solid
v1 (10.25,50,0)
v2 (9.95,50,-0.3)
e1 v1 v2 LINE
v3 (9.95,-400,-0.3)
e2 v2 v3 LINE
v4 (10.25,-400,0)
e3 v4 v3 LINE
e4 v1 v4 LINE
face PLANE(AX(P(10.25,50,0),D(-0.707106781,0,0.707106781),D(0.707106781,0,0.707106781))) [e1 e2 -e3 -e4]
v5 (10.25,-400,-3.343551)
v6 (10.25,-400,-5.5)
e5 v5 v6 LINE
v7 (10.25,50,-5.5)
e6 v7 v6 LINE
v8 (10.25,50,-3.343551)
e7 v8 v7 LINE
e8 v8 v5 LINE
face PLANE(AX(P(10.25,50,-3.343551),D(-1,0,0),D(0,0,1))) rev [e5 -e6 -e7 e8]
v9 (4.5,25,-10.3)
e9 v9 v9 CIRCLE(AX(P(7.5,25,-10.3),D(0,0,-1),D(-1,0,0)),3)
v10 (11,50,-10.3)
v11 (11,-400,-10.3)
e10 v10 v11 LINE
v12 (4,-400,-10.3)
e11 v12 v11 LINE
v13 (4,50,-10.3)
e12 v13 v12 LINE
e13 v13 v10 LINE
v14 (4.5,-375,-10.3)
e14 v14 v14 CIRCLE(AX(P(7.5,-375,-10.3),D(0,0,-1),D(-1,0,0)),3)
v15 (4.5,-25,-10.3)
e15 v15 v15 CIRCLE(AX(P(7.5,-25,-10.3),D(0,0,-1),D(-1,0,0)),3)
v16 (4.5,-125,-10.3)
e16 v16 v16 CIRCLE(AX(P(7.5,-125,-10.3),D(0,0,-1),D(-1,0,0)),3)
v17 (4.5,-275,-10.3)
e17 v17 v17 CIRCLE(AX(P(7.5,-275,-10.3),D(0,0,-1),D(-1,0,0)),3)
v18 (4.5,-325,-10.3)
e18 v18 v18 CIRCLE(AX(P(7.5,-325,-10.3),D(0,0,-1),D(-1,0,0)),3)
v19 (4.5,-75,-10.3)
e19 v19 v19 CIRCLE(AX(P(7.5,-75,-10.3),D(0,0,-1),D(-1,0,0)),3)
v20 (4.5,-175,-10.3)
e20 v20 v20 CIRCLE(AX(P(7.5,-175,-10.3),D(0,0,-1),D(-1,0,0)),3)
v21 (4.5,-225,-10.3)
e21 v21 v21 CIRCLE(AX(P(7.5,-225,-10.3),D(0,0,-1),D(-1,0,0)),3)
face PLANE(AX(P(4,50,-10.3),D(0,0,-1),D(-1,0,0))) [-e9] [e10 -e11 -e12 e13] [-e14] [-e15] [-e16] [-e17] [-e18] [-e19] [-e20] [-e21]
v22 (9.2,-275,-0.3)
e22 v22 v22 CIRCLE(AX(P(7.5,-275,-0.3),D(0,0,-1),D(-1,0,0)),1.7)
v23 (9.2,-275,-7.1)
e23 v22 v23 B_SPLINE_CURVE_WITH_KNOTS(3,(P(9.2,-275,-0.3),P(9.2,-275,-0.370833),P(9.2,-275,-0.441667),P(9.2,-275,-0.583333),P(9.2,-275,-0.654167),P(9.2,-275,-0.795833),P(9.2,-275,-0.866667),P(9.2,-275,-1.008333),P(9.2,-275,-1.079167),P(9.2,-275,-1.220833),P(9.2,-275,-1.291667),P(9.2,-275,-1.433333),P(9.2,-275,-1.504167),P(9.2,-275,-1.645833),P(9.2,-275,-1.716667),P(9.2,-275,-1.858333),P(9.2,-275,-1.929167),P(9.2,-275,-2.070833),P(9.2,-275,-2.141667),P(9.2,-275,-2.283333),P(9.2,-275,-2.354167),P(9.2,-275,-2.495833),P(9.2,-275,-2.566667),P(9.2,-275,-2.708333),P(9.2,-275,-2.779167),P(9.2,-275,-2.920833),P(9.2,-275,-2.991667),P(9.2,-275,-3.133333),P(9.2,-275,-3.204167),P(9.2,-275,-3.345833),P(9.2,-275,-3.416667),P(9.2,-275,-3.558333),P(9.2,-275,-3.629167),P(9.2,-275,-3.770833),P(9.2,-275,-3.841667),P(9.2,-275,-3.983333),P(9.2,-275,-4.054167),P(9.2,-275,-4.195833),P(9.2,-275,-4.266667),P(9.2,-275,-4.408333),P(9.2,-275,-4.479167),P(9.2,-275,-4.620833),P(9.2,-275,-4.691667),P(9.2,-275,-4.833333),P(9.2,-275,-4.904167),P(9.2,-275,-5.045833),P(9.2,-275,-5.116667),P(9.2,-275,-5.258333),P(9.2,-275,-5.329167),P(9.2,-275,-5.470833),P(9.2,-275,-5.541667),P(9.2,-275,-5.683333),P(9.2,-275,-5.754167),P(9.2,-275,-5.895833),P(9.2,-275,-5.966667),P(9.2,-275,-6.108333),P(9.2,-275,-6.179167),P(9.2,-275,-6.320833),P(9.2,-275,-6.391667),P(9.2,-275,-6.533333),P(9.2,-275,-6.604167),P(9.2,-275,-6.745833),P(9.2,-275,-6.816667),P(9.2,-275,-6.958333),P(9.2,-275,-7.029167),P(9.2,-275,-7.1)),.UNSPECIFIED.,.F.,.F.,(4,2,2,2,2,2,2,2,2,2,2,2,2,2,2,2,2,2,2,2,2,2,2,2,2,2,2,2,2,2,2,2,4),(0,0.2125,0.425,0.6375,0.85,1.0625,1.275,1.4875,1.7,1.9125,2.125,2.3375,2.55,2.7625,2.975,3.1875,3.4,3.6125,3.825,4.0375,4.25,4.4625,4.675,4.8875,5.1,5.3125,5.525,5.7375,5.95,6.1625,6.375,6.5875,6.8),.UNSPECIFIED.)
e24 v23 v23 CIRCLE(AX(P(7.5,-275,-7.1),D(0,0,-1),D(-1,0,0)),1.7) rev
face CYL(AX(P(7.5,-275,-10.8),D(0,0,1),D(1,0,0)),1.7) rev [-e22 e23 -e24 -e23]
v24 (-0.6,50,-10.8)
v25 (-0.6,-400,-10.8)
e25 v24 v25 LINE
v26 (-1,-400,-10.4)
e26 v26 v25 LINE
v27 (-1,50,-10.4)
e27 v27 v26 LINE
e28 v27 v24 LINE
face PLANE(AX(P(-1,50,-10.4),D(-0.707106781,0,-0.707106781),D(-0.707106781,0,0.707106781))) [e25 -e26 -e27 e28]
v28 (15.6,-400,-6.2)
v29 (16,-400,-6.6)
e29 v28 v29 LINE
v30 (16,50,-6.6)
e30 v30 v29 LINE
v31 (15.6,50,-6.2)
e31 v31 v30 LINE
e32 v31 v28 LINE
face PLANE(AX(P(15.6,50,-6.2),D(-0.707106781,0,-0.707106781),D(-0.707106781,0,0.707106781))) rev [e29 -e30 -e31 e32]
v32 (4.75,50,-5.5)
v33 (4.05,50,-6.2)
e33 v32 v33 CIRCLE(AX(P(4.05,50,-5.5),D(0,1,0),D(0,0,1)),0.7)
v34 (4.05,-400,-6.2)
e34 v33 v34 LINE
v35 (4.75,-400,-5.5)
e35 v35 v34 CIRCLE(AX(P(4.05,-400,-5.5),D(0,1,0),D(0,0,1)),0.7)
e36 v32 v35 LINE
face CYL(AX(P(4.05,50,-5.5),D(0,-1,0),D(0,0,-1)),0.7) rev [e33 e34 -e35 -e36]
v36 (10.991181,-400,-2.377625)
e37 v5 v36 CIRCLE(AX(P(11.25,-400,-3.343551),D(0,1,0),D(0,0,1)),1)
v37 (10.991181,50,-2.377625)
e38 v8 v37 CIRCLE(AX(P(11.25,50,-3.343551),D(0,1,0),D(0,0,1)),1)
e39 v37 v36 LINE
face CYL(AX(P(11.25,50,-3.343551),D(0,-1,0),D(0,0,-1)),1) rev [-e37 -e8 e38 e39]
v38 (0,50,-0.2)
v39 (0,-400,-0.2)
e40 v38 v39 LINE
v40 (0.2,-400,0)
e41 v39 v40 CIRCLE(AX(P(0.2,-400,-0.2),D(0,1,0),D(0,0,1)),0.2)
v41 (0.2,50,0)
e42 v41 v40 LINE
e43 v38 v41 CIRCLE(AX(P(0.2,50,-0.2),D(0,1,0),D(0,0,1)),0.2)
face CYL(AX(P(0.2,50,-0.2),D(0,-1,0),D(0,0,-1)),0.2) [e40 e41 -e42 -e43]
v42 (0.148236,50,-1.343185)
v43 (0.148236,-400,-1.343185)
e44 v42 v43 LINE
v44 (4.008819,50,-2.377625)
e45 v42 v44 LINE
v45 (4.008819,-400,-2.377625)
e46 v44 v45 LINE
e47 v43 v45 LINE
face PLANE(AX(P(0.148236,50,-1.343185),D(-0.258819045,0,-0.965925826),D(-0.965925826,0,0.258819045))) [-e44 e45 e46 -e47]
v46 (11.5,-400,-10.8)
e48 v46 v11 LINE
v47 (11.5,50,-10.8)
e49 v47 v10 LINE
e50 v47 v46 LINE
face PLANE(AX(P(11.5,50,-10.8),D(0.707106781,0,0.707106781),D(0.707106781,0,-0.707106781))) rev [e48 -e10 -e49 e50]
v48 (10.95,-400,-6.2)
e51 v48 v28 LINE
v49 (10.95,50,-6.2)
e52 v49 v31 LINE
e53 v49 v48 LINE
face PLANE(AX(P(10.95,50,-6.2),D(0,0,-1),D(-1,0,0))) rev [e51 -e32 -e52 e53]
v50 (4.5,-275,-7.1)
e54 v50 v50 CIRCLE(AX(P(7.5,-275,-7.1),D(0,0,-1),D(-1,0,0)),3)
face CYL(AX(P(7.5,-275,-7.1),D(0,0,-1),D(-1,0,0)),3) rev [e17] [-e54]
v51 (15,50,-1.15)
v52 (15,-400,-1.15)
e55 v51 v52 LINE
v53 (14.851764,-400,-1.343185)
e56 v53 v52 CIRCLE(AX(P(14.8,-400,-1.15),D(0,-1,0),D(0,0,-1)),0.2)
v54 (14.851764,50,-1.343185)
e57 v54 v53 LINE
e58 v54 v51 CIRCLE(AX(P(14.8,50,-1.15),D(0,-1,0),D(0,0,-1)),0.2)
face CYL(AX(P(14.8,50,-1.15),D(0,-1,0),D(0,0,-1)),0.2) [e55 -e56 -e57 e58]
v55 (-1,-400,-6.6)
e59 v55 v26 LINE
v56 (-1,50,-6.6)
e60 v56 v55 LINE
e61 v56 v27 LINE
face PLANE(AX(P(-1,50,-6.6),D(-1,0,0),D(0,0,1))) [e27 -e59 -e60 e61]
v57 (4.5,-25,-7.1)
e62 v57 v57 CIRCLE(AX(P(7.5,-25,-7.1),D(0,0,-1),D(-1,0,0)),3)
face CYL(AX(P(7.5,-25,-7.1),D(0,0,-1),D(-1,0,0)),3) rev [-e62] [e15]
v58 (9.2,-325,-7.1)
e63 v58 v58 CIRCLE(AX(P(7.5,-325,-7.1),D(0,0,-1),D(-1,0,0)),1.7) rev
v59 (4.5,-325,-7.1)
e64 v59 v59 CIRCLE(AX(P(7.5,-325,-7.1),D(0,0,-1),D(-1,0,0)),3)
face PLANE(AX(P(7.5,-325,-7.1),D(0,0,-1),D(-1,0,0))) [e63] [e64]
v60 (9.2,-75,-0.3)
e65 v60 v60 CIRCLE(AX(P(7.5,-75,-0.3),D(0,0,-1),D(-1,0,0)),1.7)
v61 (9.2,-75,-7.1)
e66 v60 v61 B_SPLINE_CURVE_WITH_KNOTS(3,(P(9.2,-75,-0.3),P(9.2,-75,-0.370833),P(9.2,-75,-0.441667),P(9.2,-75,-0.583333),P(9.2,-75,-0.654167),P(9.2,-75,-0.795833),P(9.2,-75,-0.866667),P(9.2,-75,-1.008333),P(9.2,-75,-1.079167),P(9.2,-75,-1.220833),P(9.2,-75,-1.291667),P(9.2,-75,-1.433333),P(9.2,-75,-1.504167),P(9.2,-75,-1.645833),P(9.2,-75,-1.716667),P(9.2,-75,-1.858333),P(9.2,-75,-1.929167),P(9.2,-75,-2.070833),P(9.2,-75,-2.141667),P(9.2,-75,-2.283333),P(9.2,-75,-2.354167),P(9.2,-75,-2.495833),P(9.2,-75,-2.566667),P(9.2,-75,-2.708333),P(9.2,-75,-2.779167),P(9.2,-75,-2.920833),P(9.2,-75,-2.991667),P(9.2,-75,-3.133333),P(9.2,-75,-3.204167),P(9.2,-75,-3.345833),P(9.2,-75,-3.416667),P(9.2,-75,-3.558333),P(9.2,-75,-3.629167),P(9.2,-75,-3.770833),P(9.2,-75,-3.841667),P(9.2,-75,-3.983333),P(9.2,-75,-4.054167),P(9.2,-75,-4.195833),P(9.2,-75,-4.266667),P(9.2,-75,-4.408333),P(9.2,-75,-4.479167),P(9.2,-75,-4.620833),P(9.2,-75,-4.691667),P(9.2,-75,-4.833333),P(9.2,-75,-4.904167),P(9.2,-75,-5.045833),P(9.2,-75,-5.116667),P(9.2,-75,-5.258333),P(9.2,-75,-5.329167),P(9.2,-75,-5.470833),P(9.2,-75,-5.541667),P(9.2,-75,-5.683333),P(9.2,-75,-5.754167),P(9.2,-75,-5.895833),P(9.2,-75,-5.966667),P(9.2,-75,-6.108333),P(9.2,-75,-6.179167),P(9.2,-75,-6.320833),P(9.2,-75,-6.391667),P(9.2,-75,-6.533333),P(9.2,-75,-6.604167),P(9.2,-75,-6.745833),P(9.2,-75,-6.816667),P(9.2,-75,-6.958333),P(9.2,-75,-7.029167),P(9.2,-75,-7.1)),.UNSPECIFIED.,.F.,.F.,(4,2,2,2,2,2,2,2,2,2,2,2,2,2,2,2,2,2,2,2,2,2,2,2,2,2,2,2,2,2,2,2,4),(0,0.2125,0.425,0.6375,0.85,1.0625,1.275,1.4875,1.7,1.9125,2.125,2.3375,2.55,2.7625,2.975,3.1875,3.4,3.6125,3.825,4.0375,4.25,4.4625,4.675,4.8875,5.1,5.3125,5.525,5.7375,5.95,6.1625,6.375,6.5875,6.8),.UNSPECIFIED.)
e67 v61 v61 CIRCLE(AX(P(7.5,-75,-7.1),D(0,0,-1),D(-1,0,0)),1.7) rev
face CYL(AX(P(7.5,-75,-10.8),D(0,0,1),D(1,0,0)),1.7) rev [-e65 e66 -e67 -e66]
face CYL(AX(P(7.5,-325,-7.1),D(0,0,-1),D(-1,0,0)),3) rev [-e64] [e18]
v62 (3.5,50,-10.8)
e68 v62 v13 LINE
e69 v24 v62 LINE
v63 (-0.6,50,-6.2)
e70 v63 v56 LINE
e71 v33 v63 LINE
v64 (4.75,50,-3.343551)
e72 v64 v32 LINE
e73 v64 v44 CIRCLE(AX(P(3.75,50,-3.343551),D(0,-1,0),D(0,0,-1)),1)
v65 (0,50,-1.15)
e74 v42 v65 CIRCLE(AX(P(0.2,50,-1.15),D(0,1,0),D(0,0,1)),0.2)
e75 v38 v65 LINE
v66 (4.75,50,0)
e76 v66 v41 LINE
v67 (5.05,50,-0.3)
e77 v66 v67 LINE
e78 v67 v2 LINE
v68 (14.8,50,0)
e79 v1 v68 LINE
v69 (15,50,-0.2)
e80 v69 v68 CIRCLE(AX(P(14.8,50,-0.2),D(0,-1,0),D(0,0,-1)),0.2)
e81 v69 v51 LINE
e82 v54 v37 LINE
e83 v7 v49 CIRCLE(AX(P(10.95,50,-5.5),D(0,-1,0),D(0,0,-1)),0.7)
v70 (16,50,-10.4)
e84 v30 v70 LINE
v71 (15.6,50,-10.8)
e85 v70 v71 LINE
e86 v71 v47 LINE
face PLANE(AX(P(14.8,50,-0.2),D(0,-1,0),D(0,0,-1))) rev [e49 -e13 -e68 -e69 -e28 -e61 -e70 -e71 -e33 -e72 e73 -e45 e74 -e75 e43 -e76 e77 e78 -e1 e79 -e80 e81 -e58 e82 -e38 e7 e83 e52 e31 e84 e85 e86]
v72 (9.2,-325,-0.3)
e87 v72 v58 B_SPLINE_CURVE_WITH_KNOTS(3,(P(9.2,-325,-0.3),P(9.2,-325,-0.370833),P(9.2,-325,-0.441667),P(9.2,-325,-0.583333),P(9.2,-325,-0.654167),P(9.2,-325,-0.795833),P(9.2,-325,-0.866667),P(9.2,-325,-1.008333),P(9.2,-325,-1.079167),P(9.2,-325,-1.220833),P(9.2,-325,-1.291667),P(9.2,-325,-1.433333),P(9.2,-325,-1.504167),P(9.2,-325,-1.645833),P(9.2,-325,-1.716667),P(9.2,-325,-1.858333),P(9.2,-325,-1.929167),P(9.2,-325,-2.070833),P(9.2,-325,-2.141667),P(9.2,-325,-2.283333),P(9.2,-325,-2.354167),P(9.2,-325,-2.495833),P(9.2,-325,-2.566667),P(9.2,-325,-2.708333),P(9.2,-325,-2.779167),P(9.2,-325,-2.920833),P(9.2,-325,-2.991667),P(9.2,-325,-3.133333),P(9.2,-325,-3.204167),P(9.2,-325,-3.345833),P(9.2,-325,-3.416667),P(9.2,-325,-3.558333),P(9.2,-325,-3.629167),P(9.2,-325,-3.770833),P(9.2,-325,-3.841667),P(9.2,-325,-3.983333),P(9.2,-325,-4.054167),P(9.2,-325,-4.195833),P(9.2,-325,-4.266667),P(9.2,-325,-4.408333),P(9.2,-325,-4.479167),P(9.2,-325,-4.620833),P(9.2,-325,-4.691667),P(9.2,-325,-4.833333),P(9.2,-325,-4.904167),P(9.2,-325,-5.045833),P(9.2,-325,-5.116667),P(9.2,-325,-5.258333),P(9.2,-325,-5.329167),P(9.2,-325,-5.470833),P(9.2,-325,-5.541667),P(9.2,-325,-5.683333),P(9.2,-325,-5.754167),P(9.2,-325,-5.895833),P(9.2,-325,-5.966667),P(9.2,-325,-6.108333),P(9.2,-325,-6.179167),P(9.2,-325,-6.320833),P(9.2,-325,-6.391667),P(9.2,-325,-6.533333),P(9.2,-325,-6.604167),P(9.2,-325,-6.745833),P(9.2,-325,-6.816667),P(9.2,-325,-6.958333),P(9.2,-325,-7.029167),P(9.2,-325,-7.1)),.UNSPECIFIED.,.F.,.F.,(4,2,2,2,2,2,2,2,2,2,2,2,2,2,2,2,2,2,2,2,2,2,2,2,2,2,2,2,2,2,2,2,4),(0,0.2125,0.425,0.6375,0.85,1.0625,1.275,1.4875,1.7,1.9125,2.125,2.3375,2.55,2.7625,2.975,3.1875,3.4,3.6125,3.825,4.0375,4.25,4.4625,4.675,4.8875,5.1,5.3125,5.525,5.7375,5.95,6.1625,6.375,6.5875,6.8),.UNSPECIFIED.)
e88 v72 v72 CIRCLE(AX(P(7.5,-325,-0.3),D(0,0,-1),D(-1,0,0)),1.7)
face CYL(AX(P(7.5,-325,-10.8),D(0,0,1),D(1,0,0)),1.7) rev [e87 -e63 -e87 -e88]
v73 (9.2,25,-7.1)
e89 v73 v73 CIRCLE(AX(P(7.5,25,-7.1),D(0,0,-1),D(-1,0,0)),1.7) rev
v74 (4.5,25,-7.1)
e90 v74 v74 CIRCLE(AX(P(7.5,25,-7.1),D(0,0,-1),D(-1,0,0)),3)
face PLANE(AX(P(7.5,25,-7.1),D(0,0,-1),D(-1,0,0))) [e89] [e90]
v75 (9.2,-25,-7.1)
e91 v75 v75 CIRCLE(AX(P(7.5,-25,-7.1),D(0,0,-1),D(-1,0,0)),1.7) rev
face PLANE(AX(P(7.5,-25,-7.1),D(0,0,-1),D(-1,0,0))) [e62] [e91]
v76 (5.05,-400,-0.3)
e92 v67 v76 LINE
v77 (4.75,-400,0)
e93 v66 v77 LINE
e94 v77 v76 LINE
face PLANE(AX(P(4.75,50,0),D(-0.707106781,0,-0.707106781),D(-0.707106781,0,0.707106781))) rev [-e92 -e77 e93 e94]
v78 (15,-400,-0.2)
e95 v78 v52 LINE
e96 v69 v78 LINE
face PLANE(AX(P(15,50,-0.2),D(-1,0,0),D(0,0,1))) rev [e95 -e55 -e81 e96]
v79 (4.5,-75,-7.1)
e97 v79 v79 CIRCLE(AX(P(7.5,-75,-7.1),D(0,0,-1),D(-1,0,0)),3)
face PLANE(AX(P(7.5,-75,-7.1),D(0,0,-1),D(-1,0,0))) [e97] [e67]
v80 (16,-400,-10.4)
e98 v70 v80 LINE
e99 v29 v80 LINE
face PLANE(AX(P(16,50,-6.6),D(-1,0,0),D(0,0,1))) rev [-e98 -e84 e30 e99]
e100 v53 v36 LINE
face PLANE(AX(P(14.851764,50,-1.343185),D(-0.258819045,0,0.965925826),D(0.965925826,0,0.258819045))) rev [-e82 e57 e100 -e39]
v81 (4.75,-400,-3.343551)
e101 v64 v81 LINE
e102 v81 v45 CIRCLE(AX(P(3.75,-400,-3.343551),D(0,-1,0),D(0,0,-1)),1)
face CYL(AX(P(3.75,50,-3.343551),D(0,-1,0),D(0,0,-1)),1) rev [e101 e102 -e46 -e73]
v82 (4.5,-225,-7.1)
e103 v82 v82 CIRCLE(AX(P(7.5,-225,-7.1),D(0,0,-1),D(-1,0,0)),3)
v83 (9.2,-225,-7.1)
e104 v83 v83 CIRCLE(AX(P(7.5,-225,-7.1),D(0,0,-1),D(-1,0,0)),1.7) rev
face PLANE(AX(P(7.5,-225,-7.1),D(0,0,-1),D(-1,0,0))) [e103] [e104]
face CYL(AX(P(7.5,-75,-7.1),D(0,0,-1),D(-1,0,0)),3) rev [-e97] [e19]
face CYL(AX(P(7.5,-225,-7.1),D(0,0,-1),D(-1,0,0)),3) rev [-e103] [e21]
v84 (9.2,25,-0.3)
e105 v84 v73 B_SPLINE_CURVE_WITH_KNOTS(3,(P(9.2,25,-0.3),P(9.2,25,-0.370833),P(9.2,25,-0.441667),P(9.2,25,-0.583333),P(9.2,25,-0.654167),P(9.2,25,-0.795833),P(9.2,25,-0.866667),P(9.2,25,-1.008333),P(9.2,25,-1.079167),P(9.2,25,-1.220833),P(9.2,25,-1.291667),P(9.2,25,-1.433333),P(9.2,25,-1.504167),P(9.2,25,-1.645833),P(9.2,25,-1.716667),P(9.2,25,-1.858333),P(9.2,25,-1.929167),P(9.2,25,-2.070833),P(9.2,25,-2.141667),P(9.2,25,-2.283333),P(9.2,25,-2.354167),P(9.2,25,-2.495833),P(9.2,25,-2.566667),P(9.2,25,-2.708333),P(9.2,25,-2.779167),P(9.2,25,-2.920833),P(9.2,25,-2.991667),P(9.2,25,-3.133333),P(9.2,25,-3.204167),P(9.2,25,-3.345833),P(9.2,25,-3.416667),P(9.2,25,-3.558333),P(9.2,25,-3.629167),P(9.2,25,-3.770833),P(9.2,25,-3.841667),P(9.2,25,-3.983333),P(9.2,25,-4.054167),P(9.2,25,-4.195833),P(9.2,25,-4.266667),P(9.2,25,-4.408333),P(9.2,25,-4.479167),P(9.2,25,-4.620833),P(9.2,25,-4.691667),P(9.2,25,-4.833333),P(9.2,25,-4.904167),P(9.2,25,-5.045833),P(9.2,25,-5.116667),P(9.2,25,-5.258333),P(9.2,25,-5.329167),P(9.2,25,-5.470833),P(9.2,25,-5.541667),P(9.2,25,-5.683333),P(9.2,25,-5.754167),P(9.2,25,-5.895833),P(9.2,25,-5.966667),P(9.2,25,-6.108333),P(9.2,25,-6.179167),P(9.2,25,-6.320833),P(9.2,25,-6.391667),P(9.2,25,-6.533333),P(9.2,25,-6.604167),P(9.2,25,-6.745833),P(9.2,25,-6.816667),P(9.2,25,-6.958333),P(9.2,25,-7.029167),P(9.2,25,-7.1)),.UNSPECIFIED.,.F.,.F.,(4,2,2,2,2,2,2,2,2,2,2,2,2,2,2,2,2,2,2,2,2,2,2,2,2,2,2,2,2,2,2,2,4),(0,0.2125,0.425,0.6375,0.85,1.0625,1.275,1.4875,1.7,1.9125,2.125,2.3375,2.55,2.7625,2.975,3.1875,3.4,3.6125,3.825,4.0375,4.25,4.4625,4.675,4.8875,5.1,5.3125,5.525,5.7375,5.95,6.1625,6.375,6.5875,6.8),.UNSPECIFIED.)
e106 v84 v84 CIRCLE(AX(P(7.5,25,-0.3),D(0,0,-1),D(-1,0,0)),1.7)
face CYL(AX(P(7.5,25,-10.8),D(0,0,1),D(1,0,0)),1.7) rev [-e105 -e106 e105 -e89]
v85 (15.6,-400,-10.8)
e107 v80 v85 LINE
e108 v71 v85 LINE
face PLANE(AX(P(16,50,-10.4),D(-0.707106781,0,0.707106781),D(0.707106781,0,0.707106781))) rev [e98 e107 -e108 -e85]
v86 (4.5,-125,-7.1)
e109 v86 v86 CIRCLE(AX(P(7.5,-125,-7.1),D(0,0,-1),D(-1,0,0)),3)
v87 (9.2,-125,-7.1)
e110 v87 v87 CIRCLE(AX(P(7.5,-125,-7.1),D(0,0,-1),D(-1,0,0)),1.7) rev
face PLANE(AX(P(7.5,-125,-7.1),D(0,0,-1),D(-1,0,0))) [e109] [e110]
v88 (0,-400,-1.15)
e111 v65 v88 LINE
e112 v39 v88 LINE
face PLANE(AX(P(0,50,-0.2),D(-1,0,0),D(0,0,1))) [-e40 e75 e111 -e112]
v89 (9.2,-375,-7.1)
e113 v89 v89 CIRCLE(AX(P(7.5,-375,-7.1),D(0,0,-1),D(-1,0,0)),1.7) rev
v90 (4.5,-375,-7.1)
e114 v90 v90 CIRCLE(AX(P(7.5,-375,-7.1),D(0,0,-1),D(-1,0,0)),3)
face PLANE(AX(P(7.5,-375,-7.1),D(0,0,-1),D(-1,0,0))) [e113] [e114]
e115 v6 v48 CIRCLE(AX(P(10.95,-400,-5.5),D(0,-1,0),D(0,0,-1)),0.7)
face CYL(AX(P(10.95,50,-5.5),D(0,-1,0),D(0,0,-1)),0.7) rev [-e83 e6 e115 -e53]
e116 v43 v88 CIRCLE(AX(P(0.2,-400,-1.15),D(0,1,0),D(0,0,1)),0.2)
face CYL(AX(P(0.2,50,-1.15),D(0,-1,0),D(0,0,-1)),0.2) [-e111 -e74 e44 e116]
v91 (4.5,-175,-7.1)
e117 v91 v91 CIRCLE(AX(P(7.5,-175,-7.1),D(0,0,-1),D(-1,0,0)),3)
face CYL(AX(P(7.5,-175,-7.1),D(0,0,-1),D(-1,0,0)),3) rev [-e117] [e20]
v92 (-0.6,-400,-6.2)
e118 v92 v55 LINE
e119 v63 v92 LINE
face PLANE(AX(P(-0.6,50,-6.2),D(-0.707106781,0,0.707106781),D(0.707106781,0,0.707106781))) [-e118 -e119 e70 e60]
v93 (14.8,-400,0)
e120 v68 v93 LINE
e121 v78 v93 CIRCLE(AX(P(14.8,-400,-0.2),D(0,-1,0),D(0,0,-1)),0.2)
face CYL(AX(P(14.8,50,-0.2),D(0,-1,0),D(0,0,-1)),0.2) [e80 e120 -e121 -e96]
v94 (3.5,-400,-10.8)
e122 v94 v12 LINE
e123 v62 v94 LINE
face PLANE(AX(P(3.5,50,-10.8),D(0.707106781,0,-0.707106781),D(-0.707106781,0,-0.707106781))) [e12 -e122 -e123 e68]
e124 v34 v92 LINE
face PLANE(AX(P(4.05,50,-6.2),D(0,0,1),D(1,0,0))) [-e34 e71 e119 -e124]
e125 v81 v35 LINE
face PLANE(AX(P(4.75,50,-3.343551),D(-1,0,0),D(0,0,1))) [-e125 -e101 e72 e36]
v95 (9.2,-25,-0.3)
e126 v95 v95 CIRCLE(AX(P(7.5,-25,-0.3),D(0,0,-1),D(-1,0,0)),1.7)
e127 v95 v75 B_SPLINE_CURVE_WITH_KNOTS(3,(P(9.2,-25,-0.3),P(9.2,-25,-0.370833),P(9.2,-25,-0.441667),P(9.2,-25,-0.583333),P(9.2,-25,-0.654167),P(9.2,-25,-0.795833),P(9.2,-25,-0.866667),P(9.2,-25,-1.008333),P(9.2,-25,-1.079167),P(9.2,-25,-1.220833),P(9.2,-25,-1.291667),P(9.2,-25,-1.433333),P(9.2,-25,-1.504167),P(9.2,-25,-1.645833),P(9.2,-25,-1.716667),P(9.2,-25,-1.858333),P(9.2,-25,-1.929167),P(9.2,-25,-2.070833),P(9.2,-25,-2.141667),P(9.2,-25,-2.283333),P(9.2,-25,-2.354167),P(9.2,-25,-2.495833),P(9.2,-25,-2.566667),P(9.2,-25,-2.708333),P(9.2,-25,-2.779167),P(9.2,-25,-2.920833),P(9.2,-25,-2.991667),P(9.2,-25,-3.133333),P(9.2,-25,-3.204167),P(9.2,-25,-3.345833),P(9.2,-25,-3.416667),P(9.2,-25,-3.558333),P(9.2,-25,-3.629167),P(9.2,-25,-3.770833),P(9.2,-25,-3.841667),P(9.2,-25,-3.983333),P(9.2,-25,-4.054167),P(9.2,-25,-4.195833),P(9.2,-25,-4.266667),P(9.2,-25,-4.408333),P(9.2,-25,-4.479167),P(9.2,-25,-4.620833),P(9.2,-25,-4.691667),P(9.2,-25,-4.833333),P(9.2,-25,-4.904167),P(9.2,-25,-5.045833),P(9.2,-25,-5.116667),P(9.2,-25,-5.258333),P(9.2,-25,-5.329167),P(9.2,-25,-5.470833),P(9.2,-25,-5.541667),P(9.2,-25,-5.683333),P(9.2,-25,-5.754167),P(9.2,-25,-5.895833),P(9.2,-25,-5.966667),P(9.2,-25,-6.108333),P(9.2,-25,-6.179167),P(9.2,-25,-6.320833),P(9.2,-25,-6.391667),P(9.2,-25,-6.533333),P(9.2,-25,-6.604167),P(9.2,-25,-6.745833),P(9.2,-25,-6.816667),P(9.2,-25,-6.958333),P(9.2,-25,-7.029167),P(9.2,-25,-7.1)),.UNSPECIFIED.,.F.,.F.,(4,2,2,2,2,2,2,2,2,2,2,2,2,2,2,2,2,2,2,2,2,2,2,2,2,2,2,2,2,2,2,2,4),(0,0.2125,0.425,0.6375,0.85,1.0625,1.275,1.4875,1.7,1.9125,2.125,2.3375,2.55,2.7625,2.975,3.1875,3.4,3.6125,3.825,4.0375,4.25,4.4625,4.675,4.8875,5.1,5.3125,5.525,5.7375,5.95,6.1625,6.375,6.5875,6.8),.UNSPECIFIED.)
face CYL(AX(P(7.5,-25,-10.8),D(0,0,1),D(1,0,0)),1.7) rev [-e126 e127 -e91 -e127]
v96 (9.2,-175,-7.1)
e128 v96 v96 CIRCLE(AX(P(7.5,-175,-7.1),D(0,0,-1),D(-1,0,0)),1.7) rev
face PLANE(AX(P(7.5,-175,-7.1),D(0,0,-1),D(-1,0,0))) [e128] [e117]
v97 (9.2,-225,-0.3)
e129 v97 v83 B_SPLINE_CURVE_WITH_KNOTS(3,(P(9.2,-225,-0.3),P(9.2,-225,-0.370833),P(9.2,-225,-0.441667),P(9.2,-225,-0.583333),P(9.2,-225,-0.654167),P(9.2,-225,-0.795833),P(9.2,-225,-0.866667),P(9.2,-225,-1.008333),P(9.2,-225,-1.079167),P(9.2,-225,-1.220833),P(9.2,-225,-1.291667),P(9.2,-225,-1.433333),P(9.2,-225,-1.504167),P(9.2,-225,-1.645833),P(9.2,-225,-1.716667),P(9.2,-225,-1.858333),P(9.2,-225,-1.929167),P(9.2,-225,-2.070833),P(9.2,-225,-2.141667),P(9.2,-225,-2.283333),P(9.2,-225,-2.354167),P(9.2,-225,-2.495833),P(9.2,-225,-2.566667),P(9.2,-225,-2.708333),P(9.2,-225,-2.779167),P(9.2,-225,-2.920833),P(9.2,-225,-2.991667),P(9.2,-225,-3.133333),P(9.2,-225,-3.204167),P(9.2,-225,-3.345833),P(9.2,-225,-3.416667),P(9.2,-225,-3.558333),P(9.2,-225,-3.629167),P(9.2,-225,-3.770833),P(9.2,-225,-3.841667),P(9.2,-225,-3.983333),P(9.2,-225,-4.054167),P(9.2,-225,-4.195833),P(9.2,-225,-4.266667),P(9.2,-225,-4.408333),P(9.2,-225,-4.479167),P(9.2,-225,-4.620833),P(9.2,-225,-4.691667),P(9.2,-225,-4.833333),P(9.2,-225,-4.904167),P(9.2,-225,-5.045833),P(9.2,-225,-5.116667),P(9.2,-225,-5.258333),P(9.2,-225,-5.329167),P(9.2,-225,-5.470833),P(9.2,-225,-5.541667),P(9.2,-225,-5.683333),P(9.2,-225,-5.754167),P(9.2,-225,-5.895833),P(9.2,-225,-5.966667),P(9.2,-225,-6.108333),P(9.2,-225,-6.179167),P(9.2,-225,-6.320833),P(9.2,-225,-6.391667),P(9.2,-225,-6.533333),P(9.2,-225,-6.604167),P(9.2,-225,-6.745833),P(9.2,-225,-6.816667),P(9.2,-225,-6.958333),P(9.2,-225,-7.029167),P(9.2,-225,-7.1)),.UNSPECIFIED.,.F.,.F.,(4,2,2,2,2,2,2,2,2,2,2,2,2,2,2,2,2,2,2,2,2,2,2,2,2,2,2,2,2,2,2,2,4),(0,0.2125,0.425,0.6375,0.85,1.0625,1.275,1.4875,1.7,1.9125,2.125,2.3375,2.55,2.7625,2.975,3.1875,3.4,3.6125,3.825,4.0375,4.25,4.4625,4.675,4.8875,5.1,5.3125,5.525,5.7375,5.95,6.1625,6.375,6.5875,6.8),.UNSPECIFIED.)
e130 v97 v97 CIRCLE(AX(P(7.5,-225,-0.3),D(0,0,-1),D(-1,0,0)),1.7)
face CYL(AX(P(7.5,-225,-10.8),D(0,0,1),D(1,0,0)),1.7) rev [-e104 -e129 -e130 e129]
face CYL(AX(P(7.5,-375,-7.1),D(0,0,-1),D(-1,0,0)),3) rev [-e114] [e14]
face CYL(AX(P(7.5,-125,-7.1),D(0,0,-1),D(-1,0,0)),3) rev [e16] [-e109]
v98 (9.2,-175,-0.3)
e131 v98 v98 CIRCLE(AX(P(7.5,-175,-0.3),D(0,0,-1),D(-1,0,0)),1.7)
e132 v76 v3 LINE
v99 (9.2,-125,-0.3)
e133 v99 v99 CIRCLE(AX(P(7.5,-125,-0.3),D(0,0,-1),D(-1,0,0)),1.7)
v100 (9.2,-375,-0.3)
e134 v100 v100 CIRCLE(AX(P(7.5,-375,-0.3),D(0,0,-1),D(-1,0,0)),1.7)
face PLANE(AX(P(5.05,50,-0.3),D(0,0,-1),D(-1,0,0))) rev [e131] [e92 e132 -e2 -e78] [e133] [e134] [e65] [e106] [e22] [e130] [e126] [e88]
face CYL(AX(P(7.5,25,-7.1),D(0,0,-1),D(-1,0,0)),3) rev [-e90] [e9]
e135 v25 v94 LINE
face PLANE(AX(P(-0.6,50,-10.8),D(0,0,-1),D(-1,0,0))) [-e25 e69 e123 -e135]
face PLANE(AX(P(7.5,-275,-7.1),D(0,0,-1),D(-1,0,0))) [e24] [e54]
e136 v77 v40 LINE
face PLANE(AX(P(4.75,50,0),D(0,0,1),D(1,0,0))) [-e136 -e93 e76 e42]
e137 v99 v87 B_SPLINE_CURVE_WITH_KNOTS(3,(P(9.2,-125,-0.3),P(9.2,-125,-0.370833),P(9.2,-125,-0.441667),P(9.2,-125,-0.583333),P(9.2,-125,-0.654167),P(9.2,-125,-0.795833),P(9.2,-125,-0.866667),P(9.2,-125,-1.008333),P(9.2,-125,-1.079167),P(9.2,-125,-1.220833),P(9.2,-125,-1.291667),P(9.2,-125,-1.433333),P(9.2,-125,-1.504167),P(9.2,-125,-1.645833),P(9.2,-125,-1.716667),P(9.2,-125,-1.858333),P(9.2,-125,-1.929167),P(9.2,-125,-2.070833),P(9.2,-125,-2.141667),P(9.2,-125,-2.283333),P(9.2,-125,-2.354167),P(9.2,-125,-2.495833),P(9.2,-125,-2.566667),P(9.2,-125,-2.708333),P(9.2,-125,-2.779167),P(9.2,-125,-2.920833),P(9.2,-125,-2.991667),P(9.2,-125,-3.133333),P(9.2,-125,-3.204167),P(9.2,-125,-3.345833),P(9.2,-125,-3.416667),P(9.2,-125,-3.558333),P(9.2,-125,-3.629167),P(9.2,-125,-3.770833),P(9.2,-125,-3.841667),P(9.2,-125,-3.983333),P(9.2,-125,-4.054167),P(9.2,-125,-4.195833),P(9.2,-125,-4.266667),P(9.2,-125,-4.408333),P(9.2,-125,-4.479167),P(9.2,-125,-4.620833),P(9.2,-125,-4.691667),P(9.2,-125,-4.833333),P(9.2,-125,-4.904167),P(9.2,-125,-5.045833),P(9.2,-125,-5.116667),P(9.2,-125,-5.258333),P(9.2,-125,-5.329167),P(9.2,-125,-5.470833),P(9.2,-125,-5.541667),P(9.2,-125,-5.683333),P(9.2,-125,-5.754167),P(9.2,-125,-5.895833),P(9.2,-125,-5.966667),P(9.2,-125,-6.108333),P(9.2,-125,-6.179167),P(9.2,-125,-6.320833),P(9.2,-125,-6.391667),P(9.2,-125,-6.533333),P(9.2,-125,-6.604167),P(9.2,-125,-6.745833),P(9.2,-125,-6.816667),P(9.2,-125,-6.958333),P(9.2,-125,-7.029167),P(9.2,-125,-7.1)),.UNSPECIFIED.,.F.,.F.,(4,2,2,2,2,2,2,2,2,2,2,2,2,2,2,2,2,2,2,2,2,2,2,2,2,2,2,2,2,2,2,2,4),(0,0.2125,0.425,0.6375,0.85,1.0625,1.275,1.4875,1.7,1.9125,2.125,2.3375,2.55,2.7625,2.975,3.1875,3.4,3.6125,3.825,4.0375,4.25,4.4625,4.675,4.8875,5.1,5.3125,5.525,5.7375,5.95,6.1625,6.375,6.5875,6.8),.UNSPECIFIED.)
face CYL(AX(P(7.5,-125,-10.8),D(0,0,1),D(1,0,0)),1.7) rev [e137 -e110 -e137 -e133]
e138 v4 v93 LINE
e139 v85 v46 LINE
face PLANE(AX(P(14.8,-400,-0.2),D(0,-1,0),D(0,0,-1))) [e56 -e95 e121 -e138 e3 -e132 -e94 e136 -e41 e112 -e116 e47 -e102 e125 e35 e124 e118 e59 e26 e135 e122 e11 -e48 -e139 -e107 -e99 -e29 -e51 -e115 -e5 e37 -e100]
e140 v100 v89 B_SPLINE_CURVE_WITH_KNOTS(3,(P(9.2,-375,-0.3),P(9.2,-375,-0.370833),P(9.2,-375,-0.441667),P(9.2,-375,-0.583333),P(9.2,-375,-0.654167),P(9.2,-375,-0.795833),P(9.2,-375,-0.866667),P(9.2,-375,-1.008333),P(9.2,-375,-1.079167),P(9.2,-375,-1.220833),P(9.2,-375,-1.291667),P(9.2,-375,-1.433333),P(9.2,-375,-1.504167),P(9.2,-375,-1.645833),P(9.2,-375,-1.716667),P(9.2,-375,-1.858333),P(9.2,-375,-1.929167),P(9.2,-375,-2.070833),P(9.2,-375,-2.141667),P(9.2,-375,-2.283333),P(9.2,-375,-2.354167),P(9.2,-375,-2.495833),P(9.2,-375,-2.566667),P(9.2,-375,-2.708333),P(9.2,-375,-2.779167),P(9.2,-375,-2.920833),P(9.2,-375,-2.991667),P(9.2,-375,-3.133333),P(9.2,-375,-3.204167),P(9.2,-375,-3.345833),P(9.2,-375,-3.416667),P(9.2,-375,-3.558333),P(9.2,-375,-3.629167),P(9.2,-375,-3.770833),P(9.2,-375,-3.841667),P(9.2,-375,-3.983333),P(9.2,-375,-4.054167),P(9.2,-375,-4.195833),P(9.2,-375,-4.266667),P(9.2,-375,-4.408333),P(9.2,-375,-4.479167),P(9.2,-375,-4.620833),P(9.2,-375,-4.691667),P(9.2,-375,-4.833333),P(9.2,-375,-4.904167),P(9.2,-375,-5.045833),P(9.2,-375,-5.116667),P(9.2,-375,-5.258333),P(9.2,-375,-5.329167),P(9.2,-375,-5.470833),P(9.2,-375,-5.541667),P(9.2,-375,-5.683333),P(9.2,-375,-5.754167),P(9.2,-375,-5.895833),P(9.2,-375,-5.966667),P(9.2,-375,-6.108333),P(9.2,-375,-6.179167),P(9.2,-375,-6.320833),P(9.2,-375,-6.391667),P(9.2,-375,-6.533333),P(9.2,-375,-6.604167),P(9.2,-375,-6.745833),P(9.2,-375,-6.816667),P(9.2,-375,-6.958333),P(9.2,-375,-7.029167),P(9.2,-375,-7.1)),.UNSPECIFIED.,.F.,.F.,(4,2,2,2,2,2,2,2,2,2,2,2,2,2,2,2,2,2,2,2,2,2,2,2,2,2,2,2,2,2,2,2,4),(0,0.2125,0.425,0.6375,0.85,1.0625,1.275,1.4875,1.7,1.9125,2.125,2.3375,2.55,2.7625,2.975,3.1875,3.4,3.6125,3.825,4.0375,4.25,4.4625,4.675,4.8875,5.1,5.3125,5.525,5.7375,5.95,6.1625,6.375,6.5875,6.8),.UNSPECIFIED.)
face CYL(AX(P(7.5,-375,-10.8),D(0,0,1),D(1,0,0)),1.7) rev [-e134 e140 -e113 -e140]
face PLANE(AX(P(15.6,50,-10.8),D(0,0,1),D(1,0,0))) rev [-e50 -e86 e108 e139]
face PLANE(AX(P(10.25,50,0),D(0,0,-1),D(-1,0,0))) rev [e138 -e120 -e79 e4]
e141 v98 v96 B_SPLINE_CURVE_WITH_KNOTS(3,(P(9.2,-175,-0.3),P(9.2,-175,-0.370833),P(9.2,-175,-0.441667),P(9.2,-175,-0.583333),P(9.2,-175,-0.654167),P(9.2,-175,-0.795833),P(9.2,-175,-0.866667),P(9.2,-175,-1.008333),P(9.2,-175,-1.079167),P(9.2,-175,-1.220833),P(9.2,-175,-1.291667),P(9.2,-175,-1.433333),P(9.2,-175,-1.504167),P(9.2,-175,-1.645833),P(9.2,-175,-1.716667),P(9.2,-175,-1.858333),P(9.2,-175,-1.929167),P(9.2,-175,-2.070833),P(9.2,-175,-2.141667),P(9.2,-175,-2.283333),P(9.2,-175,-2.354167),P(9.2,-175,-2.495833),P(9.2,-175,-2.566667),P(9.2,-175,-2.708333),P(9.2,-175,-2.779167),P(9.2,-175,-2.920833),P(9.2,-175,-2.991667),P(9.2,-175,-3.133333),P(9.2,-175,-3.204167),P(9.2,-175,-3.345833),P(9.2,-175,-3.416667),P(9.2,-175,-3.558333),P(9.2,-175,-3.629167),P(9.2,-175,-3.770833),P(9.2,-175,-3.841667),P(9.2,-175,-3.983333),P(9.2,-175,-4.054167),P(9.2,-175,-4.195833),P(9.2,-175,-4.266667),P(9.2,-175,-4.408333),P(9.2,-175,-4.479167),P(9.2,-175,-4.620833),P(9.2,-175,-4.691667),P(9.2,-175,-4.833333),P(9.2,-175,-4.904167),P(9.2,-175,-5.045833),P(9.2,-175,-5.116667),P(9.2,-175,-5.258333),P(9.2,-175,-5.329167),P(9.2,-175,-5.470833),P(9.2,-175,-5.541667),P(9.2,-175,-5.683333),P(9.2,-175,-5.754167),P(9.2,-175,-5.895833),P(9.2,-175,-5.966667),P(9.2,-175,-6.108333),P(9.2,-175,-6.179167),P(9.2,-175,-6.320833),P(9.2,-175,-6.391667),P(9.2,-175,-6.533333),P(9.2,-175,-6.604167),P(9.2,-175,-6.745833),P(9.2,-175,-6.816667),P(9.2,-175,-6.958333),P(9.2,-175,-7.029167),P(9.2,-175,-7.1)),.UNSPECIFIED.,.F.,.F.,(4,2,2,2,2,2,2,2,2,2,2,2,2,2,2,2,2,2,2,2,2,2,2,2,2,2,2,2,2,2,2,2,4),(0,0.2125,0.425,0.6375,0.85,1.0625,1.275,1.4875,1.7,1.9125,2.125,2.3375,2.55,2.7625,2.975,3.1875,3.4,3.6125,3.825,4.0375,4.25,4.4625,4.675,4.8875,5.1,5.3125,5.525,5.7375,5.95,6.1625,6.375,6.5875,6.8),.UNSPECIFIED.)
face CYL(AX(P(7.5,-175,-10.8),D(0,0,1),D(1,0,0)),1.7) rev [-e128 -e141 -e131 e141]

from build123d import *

# Parameters (mm, degrees)
BOSS_EXTRUDE1_DEPTH = 50
SKETCH2_R           = 1.7
CUT_EXTRUDE1_DEPTH  = 54.597014842
SKETCH3_R           = 3
CUT_EXTRUDE2_DEPTH  = 3.2
LPATTERN1_COUNT     = 9
LPATTERN1_PITCH     = 50


with BuildPart() as part:
    # Sketch1 → Boss-Extrude1 (new body)
    with BuildSketch(Plane(origin=(0, 0, 0), x_dir=(1, 0, 0), z_dir=(0, 1, 0))):
        with BuildLine():
            Line((0, 0.2), (0, 1.15))
            ThreePointArc((0, 1.15), (0.041329332, 1.271752286), (0.148236191, 1.343185165))
            Line((0.148236191, 1.343185165), (4.008819045, 2.377625223))
            ThreePointArc((4.008819045, 2.377625223), (4.54335334, 2.734789621), (4.75, 3.34355105))
            Line((4.75, 3.34355105), (4.75, 5.5))
            ThreePointArc((4.75, 5.5), (4.544974747, 5.994974747), (4.05, 6.2))
            Line((4.05, 6.2), (-0.6, 6.2))
            Line((-0.6, 6.2), (-1, 6.6))
            Line((-1, 6.6), (-1, 10.4))
            Line((-1, 10.4), (-0.6, 10.8))
            Line((-0.6, 10.8), (3.5, 10.8))
            Line((3.5, 10.8), (4, 10.3))
            Line((4, 10.3), (11, 10.3))
            Line((11, 10.3), (11.5, 10.8))
            Line((11.5, 10.8), (15.6, 10.8))
            Line((15.6, 10.8), (16, 10.4))
            Line((16, 10.4), (16, 6.6))
            Line((16, 6.6), (15.6, 6.2))
            Line((15.6, 6.2), (10.95, 6.2))
            ThreePointArc((10.95, 6.2), (10.455025253, 5.994974747), (10.25, 5.5))
            Line((10.25, 5.5), (10.25, 3.34355105))
            ThreePointArc((10.25, 3.34355105), (10.45664666, 2.734789621), (10.991180955, 2.377625223))
            Line((10.991180955, 2.377625223), (14.851763809, 1.343185165))
            ThreePointArc((14.851763809, 1.343185165), (14.958670668, 1.271752286), (15, 1.15))
            Line((15, 1.15), (15, 0.2))
            ThreePointArc((15, 0.2), (14.941421356, 0.058578644), (14.8, 0))
            Line((14.8, 0), (10.25, 0))
            Line((10.25, 0), (9.95, 0.3))
            Line((9.95, 0.3), (5.05, 0.3))
            Line((5.05, 0.3), (4.75, 0))
            Line((4.75, 0), (0.2, 0))
            ThreePointArc((0.2, 0), (0.058578644, 0.058578644), (0, 0.2))
        make_face()
    boss_extrude1 = extrude(amount=BOSS_EXTRUDE1_DEPTH)

    # Sketch2 → Cut-Extrude1 (cut, through all)
    with BuildSketch(Plane.XY):
        with Locations((7.5, 25)):
            Circle(SKETCH2_R)
    cut_extrude1 = extrude(amount=-CUT_EXTRUDE1_DEPTH, mode=Mode.SUBTRACT)

    # Sketch3 → Cut-Extrude2 (cut)
    with BuildSketch(Plane(origin=(0, 0, -10.3), x_dir=(-1, 0, 0), z_dir=(0, 0, -1))):
        with Locations((-7.5, 25)):
            Circle(SKETCH3_R)
    cut_extrude2 = extrude(amount=-CUT_EXTRUDE2_DEPTH, mode=Mode.SUBTRACT)

    # LPattern1: Boss-Extrude1, Cut-Extrude1, Cut-Extrude2 ×9
    with Locations(*[(0, -i * LPATTERN1_PITCH, 0) for i in range(1, LPATTERN1_COUNT)]):
        add(boss_extrude1)
        add(cut_extrude1, mode=Mode.SUBTRACT)
        add(cut_extrude2, mode=Mode.SUBTRACT)


solid = part.part
